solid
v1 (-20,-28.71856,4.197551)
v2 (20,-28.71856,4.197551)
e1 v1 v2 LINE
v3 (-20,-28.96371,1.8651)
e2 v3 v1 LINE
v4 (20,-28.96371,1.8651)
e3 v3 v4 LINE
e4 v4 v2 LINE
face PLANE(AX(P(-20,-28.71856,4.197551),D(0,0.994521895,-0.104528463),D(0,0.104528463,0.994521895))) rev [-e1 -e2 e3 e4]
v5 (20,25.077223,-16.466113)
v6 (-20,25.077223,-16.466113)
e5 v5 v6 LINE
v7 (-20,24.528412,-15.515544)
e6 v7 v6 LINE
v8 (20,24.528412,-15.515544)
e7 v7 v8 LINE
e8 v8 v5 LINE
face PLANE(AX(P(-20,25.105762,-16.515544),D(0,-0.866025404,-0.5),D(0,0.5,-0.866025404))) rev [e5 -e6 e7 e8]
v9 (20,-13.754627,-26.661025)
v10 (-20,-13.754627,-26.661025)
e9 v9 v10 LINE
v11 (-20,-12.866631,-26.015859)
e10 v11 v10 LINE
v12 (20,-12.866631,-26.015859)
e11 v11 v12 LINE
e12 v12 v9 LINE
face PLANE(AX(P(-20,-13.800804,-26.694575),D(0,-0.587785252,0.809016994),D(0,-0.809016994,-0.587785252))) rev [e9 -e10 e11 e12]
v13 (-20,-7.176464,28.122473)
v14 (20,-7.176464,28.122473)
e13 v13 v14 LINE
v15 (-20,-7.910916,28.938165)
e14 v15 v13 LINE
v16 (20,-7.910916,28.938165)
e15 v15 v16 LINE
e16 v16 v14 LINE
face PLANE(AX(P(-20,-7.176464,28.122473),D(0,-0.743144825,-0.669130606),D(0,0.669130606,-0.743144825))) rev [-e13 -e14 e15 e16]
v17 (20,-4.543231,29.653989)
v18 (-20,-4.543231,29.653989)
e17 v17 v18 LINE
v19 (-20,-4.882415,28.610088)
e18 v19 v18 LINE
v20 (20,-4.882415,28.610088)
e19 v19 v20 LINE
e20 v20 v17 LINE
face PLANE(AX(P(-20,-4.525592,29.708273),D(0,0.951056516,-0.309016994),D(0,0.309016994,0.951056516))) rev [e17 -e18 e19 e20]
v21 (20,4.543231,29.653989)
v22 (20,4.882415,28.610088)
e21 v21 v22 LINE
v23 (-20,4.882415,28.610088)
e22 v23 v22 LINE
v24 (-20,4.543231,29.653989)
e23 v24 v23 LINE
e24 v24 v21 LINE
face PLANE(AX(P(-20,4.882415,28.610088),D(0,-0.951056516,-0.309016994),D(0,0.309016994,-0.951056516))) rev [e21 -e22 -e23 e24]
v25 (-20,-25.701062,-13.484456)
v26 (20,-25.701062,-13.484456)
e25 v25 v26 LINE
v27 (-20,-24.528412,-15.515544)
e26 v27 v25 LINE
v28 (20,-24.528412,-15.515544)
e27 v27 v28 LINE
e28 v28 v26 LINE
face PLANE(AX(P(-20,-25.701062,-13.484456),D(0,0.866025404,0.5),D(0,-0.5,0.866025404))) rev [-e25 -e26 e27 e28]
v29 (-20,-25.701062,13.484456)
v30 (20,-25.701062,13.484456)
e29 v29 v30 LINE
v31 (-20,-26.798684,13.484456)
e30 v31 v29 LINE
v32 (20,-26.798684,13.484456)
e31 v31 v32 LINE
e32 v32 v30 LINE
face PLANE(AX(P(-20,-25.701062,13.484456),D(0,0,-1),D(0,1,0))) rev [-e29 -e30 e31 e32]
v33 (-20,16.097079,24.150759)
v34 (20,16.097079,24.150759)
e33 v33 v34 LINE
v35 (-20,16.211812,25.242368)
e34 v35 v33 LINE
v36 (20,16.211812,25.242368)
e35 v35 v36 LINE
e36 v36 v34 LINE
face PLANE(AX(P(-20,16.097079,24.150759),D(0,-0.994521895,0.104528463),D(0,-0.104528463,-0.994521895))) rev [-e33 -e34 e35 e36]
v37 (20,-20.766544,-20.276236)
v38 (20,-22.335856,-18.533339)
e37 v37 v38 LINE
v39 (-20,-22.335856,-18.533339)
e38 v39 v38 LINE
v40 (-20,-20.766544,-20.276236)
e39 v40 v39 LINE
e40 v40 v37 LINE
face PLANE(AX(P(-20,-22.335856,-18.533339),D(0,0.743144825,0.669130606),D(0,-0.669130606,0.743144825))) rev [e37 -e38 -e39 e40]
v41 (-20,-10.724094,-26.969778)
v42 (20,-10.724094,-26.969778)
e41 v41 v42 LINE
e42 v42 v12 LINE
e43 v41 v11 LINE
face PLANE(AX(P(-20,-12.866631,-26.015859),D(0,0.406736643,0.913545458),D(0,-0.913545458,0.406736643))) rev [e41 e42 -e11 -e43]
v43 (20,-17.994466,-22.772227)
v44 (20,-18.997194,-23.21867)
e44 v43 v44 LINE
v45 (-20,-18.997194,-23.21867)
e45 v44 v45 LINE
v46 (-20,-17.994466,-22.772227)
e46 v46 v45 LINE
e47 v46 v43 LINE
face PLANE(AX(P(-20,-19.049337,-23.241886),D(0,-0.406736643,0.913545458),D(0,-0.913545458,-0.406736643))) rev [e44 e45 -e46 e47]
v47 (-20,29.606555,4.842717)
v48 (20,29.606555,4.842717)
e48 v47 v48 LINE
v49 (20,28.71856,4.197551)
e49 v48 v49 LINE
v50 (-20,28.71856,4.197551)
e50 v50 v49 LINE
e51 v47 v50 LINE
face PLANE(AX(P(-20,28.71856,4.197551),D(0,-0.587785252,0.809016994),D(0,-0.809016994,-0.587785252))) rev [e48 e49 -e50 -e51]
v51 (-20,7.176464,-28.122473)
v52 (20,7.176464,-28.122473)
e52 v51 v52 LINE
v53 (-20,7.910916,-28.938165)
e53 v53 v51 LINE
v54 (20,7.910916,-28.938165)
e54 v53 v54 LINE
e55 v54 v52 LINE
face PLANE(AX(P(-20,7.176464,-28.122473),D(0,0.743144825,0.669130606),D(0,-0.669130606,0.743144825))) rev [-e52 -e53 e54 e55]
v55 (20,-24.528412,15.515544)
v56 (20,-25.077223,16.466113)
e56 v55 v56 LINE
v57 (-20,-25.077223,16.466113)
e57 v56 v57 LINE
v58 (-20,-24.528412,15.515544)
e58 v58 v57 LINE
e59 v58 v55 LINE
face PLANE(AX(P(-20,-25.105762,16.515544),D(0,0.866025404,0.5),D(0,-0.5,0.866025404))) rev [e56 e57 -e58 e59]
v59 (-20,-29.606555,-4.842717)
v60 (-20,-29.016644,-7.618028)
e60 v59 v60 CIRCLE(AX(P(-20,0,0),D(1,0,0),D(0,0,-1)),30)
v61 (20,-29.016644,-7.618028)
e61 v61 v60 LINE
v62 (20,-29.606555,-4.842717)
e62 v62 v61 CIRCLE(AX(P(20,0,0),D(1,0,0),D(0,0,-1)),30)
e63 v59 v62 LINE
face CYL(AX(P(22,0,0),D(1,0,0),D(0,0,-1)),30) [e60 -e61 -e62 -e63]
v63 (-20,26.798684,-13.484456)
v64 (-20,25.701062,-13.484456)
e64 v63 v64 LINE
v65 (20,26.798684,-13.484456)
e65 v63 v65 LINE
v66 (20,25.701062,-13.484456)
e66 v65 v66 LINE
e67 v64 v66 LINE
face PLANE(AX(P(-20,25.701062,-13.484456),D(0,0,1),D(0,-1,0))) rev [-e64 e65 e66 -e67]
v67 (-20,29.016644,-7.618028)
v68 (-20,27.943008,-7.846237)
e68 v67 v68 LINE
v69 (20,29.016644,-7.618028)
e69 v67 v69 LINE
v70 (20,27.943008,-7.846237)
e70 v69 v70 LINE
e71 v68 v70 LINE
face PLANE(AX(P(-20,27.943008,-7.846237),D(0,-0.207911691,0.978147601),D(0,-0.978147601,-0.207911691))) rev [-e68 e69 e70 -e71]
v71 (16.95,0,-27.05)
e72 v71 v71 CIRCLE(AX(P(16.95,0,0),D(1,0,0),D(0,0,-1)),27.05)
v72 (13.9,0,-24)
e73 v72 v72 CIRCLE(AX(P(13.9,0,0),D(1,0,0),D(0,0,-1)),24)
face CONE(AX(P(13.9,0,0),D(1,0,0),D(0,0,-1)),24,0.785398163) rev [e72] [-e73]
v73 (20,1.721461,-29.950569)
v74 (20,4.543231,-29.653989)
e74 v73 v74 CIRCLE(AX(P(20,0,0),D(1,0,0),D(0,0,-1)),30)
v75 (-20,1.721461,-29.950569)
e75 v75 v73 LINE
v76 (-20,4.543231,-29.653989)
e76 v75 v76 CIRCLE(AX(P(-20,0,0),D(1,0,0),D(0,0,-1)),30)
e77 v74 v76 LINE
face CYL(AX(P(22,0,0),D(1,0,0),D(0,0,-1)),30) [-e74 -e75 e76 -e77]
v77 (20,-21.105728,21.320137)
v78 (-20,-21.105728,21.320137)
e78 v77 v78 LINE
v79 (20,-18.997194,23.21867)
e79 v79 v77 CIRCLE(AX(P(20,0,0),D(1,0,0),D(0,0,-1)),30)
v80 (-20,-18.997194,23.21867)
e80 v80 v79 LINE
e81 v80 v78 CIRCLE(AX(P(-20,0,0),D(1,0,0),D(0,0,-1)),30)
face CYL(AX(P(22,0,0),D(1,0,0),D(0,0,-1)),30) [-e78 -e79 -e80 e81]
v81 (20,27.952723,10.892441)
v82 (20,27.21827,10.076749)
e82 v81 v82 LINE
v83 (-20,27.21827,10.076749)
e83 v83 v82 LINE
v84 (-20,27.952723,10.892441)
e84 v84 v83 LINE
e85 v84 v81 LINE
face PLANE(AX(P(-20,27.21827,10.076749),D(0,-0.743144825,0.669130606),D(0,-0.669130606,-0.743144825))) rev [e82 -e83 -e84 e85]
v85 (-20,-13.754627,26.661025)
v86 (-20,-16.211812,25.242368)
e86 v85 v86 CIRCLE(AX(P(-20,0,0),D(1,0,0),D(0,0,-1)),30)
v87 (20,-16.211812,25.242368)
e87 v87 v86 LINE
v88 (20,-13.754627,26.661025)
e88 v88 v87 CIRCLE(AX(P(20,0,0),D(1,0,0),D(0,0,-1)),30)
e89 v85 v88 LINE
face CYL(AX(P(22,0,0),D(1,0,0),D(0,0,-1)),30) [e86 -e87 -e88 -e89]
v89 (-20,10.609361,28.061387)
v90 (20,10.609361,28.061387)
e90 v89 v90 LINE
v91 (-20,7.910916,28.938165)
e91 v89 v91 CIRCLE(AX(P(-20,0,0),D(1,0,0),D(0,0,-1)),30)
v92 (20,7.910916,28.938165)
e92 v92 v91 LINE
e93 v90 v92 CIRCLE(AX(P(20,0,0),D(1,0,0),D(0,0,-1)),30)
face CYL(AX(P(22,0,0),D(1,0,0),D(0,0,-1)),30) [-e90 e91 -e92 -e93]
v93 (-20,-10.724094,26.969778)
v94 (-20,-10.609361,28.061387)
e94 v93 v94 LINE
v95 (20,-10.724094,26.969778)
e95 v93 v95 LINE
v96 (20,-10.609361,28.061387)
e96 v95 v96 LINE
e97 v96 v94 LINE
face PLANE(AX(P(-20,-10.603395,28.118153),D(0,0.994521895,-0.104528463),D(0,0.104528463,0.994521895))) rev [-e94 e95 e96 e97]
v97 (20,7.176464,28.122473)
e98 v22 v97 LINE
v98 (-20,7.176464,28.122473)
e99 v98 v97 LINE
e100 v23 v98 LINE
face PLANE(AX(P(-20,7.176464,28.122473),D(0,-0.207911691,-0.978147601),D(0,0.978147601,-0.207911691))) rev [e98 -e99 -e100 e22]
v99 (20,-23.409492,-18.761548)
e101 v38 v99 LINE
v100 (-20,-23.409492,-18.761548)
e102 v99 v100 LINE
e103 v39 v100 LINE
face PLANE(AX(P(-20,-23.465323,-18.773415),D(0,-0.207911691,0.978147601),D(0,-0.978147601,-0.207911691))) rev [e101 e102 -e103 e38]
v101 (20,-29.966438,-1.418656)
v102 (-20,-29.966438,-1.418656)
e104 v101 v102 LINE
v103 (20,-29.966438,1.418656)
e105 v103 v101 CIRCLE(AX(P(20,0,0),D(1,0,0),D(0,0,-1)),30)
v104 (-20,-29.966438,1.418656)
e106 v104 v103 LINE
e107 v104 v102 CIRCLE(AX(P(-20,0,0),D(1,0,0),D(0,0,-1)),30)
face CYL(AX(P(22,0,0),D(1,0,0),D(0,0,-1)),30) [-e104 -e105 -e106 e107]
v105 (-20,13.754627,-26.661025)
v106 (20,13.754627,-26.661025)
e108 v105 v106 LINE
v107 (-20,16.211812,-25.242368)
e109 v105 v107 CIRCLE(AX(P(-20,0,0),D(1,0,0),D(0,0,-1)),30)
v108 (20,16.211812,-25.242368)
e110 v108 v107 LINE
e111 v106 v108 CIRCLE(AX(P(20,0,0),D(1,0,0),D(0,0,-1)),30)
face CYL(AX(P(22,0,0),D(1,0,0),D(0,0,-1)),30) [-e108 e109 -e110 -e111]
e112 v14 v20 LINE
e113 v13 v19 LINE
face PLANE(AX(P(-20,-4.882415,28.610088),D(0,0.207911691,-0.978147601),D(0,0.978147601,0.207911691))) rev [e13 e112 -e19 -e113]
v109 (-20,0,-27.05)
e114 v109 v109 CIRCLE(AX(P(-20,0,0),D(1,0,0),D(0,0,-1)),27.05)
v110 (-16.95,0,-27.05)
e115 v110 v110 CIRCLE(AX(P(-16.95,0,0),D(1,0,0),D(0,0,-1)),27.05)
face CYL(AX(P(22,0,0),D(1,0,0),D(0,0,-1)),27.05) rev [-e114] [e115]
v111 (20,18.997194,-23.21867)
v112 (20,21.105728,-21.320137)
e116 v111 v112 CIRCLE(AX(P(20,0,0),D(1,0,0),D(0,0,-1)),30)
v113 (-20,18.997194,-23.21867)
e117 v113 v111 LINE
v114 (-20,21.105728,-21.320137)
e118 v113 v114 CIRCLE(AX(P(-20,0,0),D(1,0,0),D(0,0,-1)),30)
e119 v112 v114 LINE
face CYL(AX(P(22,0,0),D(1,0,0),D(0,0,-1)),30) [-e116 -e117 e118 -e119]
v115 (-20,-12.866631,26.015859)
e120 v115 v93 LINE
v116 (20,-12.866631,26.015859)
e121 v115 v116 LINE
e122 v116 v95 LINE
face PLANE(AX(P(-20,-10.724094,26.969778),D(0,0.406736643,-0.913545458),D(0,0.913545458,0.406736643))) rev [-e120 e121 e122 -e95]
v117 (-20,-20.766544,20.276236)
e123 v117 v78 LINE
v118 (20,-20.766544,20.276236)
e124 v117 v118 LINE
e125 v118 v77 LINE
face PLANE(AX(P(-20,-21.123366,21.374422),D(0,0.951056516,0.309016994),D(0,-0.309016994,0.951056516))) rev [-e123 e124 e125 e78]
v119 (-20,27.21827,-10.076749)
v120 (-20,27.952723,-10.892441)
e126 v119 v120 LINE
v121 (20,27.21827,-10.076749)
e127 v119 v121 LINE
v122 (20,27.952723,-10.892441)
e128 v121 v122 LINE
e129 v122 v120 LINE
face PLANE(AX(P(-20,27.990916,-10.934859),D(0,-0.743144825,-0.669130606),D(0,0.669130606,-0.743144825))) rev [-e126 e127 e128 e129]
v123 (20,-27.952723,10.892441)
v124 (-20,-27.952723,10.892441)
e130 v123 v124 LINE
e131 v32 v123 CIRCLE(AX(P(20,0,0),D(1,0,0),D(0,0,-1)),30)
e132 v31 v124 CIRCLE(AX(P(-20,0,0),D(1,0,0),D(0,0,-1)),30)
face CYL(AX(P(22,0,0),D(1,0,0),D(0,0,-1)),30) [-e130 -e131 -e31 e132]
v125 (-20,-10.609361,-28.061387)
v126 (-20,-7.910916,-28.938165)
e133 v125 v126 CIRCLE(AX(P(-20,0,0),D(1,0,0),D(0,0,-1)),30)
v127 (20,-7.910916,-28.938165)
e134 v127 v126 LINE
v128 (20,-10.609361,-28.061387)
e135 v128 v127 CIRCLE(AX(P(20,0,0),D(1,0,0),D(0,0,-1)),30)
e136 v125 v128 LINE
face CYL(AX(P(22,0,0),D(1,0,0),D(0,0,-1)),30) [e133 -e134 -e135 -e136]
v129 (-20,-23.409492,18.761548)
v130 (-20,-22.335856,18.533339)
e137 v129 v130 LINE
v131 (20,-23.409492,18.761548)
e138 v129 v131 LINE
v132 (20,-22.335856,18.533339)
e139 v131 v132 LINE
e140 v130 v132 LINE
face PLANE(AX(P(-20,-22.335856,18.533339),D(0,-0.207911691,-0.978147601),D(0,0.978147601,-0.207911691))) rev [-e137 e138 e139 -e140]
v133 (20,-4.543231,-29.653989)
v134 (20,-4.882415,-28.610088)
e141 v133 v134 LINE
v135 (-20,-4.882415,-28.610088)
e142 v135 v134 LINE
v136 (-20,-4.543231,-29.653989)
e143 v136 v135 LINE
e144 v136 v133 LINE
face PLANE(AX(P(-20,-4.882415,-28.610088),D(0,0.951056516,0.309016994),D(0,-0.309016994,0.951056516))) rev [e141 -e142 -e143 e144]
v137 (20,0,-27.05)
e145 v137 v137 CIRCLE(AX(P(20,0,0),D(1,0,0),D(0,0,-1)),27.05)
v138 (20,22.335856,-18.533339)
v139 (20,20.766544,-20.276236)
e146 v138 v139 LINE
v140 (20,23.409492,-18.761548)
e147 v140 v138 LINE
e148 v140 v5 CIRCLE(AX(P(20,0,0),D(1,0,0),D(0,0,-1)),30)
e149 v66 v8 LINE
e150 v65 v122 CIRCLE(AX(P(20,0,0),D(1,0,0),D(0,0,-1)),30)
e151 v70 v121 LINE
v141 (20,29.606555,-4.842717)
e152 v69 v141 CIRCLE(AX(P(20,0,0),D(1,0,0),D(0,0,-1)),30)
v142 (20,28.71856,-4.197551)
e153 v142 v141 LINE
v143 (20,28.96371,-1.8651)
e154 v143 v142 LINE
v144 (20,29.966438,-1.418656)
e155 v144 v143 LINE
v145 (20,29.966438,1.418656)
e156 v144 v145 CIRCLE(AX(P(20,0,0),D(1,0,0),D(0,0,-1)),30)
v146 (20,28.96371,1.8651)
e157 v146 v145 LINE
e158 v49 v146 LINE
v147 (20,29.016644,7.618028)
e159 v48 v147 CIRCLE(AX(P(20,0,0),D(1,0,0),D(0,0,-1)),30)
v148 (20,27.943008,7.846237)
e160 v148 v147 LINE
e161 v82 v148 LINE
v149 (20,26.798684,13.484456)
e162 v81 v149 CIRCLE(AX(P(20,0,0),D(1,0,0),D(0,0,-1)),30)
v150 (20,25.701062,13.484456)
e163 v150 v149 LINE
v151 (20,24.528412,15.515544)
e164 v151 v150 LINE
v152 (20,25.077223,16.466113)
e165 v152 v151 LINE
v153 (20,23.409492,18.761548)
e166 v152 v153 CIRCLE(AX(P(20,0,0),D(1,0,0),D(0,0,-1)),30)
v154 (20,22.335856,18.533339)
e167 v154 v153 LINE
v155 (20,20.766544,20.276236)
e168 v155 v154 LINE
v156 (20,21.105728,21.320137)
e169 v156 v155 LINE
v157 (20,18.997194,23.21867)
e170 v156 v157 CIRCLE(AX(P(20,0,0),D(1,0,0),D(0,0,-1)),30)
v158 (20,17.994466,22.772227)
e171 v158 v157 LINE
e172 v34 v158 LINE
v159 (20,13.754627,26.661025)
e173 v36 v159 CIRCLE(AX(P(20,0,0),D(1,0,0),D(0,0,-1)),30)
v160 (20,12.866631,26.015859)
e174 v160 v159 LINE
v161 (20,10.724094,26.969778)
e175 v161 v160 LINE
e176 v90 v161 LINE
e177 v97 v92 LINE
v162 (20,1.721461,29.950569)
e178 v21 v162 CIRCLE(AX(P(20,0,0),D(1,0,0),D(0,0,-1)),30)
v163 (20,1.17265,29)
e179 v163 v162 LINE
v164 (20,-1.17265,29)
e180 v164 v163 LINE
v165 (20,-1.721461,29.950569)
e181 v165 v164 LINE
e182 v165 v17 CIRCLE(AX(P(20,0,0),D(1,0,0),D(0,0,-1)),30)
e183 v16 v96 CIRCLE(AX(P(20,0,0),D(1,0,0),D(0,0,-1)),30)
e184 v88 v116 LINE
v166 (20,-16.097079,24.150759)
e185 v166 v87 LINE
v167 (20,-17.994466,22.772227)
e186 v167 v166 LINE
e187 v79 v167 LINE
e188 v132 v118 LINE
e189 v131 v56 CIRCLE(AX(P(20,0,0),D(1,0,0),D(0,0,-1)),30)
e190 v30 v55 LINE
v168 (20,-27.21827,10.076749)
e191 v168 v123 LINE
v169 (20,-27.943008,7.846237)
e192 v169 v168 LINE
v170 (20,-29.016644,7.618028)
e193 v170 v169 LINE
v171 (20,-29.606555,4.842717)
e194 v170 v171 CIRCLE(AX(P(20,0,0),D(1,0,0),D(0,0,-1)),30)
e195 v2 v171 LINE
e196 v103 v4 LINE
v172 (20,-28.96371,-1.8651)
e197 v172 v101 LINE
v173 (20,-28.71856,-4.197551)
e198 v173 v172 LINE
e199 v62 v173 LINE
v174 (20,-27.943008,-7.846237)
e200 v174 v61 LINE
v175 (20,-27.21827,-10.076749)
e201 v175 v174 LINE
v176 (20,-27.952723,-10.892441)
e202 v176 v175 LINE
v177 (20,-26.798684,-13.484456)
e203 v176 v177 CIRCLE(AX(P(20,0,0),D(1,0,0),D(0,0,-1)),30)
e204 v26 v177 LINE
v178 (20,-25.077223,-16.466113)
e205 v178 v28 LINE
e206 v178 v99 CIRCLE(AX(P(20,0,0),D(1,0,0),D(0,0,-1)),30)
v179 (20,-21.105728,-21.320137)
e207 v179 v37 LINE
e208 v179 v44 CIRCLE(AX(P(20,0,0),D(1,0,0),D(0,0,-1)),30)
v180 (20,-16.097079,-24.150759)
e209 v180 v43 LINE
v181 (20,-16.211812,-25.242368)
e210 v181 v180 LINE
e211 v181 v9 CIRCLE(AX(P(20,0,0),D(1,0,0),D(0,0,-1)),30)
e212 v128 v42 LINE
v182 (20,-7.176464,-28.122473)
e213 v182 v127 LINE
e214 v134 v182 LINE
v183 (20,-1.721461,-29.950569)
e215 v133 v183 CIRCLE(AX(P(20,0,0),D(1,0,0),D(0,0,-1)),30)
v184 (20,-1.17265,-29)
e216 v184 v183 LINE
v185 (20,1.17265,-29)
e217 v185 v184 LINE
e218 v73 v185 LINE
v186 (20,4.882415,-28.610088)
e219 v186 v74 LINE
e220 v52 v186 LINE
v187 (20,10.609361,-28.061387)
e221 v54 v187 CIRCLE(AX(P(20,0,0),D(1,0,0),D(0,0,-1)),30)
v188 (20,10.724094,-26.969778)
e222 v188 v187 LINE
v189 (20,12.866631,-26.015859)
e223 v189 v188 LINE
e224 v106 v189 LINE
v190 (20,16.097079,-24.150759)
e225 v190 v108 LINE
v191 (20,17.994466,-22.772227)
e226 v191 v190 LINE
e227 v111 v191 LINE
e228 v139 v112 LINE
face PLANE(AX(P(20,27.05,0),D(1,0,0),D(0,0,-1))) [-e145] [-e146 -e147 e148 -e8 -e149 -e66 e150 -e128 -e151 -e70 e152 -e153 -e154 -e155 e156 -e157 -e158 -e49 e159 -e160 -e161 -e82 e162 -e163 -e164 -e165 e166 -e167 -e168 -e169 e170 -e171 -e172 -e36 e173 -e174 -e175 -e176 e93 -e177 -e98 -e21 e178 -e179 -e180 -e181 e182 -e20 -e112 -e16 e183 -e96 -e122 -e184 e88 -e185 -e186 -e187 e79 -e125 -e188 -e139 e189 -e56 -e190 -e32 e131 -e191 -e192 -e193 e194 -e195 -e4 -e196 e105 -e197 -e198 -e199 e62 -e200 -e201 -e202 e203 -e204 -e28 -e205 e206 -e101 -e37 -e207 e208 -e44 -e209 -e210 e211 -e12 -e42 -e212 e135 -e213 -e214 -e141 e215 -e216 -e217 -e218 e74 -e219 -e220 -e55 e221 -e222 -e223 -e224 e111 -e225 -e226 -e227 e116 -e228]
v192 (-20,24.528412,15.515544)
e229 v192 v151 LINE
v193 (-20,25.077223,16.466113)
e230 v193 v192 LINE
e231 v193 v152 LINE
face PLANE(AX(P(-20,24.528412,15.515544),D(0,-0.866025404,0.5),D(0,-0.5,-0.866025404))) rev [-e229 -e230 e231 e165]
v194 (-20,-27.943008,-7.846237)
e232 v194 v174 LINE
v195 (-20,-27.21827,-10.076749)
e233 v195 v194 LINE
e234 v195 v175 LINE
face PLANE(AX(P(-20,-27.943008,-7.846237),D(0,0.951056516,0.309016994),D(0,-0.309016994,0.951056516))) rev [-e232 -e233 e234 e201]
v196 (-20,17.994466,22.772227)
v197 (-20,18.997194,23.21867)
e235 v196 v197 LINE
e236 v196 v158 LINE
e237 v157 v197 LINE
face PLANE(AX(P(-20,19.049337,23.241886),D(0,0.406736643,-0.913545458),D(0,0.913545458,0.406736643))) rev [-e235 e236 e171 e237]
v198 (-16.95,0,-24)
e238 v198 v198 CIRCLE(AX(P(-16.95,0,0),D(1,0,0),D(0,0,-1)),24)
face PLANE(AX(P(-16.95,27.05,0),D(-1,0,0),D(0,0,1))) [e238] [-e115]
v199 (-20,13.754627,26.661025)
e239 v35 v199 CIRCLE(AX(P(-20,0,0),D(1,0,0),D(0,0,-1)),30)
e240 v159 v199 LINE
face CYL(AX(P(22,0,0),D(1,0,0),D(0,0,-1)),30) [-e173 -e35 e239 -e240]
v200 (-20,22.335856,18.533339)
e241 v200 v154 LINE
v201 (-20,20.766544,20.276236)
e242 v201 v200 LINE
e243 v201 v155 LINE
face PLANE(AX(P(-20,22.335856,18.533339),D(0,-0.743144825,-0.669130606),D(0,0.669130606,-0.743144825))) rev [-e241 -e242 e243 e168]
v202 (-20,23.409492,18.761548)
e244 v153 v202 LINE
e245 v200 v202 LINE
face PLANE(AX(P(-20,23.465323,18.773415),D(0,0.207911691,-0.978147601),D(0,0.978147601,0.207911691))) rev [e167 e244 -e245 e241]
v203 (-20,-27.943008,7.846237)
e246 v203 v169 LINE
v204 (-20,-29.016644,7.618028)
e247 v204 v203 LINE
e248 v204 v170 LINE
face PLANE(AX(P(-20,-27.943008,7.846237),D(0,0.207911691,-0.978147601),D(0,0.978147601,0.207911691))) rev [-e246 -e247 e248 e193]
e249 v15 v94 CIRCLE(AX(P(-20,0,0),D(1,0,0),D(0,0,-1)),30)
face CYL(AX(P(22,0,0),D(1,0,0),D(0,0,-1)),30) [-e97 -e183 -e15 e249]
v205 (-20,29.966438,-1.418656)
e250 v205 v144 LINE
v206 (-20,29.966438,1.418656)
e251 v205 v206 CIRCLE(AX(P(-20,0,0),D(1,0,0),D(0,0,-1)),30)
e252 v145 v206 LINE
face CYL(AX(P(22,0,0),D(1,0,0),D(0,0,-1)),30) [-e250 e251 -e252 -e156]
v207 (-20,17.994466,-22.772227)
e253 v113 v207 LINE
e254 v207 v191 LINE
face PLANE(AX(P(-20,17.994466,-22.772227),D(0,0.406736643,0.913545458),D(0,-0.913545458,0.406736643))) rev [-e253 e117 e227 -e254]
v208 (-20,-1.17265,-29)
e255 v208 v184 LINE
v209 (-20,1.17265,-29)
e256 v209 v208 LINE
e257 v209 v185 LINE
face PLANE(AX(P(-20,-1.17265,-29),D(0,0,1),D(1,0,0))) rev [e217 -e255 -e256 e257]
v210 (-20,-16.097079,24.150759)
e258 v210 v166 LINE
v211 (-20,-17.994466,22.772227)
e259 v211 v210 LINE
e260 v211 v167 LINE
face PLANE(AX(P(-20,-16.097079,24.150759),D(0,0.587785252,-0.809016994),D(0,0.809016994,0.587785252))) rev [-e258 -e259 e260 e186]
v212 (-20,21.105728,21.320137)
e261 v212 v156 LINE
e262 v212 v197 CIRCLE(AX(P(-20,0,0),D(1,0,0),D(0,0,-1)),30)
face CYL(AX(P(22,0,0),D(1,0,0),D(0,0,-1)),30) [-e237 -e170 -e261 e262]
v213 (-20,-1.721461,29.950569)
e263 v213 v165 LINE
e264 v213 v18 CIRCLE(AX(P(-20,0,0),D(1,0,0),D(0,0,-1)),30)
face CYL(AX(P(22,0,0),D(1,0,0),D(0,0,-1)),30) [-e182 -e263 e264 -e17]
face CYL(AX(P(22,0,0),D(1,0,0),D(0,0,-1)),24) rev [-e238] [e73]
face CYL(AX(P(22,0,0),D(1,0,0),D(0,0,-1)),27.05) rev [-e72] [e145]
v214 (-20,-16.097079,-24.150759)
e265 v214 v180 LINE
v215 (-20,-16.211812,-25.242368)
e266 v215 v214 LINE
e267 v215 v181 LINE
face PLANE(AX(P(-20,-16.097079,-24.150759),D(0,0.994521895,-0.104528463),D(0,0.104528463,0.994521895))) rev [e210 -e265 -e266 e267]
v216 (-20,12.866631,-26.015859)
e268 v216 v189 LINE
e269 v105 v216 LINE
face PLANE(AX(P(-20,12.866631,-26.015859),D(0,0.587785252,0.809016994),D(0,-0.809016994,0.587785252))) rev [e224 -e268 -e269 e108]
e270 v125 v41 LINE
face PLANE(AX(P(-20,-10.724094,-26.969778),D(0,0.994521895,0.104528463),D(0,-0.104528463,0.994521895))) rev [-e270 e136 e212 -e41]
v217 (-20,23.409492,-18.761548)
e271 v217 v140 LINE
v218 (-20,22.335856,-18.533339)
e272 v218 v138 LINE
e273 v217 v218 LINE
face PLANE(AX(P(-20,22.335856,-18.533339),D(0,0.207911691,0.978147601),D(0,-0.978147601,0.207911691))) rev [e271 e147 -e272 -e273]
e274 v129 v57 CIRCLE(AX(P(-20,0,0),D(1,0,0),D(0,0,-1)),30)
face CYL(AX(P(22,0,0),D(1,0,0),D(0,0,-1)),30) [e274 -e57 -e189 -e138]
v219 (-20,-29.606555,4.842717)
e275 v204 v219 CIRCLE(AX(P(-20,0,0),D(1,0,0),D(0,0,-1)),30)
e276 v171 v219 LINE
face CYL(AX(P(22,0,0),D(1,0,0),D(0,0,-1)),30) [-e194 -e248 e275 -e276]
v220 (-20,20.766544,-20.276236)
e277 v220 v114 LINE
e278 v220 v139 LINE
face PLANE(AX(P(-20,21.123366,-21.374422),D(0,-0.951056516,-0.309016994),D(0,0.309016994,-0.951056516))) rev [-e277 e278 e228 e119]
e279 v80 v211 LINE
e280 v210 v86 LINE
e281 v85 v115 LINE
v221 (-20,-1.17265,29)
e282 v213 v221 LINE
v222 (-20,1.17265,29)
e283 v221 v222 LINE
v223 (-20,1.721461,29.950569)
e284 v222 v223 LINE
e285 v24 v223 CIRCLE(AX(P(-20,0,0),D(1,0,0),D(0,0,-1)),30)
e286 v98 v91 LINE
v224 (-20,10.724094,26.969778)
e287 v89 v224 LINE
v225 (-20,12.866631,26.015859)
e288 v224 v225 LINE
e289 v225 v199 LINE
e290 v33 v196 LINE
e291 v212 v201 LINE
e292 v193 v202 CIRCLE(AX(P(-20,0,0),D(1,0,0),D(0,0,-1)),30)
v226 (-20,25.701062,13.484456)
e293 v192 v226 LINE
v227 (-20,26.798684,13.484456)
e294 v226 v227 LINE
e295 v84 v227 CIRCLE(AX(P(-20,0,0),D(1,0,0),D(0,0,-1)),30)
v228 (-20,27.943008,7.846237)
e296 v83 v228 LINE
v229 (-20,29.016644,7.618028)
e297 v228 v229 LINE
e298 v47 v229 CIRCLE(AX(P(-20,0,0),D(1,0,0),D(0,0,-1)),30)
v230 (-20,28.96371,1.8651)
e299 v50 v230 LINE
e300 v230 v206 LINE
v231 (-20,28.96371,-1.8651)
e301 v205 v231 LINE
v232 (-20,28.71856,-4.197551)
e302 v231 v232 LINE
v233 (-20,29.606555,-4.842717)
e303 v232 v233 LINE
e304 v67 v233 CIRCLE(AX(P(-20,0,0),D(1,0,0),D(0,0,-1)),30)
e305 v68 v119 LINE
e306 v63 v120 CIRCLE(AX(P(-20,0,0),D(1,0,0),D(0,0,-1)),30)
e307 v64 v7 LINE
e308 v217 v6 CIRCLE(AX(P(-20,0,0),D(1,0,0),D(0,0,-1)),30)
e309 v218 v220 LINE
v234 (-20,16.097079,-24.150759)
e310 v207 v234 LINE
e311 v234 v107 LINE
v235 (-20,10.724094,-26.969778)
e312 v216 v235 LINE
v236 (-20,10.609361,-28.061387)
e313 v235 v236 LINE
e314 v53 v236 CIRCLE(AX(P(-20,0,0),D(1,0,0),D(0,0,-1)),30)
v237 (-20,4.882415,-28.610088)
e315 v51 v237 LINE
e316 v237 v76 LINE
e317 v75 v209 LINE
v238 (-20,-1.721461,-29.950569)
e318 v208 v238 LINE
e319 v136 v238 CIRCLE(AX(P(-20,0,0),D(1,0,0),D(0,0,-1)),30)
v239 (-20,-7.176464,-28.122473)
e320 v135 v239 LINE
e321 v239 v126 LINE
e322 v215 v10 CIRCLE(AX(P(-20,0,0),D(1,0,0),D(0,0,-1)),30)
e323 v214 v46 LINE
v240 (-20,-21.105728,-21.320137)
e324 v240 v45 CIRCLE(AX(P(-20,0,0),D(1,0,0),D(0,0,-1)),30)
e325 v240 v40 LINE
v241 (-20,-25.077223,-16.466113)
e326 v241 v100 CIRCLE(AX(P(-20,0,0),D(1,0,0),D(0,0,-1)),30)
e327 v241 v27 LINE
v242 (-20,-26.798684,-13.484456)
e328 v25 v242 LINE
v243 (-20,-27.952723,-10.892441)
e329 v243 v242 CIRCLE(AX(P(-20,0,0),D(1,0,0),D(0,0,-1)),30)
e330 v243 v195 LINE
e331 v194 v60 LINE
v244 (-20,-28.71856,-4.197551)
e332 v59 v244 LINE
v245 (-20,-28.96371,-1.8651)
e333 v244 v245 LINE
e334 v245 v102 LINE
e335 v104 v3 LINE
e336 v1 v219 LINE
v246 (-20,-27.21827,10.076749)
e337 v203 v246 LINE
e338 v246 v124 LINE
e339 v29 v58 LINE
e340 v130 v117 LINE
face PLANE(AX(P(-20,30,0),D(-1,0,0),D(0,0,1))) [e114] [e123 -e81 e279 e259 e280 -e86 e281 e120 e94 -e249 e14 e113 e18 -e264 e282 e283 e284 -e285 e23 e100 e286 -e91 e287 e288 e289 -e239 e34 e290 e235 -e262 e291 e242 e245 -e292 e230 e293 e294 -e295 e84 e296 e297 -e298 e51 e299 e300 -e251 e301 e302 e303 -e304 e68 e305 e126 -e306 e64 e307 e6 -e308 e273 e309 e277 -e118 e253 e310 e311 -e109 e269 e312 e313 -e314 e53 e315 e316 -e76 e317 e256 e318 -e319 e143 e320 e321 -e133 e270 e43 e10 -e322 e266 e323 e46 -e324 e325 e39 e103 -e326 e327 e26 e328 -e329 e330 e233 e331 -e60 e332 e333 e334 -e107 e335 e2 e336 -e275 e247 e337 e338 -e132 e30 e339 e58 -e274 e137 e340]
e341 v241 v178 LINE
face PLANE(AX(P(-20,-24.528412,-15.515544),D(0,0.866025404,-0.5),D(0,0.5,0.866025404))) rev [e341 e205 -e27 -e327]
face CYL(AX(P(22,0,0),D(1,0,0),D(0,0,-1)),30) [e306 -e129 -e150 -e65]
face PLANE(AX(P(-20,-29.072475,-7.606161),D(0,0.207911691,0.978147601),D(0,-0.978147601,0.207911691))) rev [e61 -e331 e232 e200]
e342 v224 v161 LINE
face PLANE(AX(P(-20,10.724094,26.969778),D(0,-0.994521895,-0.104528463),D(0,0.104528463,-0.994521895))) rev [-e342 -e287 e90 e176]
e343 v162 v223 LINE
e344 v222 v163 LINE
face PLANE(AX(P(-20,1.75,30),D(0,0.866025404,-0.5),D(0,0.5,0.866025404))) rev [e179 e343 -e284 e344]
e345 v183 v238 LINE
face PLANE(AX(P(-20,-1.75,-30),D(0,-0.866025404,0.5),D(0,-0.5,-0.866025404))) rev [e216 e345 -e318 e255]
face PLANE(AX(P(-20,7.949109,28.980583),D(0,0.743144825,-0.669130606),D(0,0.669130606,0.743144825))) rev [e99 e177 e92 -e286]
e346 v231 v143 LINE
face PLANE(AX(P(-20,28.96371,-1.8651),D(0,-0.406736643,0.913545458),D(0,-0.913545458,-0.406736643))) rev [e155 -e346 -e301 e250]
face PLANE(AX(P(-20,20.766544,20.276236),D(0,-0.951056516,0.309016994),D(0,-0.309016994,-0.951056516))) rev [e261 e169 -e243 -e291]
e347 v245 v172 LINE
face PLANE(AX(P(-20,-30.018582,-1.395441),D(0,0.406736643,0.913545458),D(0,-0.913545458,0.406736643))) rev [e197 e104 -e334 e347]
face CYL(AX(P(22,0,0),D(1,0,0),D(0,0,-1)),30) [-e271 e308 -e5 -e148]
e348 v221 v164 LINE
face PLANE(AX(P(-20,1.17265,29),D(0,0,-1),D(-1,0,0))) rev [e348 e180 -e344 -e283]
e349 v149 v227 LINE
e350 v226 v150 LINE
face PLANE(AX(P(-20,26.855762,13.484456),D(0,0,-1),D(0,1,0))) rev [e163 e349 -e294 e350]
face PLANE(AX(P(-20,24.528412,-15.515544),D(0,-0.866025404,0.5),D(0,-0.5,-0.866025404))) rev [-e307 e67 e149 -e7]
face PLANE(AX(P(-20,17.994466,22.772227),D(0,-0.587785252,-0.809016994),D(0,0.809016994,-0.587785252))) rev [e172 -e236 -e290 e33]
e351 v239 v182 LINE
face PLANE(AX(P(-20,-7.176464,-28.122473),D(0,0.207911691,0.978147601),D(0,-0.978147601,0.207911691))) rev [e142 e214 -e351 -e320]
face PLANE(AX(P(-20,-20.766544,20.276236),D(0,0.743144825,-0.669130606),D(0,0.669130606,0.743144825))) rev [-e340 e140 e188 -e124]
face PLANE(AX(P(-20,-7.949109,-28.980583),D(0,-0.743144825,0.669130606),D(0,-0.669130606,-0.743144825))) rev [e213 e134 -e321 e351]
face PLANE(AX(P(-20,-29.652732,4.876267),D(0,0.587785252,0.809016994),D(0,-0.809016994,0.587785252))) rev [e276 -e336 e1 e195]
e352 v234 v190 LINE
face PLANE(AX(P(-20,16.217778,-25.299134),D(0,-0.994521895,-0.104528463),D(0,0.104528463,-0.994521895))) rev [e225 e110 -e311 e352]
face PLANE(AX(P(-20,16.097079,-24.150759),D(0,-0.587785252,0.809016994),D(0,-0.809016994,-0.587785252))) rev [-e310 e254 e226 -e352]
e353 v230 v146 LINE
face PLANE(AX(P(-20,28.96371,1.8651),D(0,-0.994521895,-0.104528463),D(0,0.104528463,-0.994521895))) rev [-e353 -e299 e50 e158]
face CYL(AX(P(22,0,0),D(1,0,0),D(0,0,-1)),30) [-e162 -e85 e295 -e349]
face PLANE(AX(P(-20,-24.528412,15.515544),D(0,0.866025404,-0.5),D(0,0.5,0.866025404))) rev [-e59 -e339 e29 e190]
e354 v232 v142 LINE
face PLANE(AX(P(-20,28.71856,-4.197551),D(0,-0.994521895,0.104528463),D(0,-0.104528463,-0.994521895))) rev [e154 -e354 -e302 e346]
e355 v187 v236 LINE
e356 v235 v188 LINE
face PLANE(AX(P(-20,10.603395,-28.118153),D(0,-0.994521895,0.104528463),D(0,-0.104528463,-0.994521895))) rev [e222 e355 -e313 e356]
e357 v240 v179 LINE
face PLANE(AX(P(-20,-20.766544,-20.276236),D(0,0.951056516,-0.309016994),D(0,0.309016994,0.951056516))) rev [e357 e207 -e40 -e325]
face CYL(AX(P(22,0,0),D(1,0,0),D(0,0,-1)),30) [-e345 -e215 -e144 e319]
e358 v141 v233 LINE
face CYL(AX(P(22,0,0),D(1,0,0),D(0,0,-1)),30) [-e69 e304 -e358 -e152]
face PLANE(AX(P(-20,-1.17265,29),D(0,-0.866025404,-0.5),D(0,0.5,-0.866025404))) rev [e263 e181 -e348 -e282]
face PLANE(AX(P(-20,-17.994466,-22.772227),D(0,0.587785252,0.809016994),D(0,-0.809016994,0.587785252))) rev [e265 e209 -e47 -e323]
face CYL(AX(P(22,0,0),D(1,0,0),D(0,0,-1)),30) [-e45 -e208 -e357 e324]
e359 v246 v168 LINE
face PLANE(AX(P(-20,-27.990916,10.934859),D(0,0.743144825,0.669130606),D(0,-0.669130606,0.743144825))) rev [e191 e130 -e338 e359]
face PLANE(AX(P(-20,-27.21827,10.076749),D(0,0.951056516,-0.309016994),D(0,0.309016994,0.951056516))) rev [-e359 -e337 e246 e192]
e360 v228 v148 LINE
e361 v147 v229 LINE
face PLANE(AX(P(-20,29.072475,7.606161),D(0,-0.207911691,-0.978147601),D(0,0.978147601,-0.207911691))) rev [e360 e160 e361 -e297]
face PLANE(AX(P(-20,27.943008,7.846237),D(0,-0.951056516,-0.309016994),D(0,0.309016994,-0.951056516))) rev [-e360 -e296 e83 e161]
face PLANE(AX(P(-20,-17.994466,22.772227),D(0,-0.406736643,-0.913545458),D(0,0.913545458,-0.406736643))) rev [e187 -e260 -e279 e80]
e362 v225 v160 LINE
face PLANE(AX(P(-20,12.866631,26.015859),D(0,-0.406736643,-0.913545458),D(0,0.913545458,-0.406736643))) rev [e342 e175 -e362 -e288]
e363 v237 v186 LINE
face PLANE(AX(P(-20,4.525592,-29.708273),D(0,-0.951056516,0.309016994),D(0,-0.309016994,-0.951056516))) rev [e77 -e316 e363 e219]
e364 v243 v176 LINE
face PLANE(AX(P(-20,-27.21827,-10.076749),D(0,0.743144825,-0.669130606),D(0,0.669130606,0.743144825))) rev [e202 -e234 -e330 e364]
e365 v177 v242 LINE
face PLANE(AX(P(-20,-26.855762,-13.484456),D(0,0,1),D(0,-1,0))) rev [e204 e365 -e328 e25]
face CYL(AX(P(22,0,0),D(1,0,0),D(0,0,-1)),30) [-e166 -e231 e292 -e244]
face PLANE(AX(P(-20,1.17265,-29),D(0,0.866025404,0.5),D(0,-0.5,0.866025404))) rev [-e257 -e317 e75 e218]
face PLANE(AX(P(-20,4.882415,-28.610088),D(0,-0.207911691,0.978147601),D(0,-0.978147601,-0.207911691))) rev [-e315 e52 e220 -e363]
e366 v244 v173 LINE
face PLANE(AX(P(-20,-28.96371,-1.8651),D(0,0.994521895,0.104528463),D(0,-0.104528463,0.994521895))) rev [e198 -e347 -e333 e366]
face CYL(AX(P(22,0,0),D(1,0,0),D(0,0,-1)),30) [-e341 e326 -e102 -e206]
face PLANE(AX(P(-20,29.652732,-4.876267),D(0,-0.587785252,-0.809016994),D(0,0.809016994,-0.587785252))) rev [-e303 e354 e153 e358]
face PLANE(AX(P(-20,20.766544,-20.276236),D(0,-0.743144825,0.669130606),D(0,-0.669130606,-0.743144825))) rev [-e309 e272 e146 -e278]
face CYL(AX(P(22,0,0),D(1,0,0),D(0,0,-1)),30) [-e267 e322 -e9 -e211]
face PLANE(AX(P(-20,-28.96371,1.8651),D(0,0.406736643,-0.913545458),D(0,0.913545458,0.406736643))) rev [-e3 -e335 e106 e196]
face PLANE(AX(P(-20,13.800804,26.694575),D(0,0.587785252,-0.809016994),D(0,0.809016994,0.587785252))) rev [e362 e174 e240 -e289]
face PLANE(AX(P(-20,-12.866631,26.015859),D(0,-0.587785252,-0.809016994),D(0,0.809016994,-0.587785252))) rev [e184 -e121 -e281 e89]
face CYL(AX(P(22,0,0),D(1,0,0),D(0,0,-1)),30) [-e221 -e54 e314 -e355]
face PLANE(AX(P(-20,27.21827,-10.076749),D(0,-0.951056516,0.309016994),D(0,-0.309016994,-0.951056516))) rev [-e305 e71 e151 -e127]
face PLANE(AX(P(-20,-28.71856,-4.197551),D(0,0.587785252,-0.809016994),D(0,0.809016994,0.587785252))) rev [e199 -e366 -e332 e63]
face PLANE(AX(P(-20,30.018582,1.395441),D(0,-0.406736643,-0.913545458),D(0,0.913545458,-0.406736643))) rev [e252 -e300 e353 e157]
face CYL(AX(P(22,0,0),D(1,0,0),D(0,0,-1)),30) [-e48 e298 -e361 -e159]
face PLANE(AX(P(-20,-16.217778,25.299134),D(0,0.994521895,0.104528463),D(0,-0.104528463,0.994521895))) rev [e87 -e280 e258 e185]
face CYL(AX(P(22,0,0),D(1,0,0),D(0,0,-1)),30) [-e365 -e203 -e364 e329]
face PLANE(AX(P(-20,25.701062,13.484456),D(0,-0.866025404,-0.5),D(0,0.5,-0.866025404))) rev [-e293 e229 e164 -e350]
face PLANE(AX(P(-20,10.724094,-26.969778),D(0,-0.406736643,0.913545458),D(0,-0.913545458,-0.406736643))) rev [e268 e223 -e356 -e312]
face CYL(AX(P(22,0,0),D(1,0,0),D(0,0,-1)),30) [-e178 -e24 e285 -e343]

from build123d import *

# Parameters (mm, degrees)
CUT_EXTRUDE2_DEPTH = 47.904157598
CIRPATTERN4_COUNT  = 30


with BuildPart() as part:
    # Sketch1 → Revolve1 (revolve)
    with BuildSketch(Plane.XY, mode=Mode.PRIVATE) as revolve1_sk:
        Polygon((-20, 30), (20, 30), (20, 27.05), (16.95, 27.05), (13.9, 24), (-16.95, 24), (-16.95, 27.05), (-20, 27.05), align=None)
    revolve(revolve1_sk.sketch.rotate(Axis((22, 0, 0), (-1, 0, 0)), 90), axis=Axis((22, 0, 0), (-1, 0, 0)))

    # Sketch6 → Cut-Extrude2 (cut, symmetric)
    with BuildSketch(Plane(origin=(0, 0, 0), x_dir=(0, 0, -1), z_dir=(1, 0, 0))):
        Polygon((-30, 1.75), (-29, 1.172649731), (-29, -1.172649731), (-30, -1.75), align=None)
    cut_extrude2 = extrude(amount=CUT_EXTRUDE2_DEPTH, both=True, mode=Mode.SUBTRACT)

    # CirPattern4: Cut-Extrude2 ×30 about axis
    cirpattern4_axis = Axis((0, 0, 0), (1, 0, 0))
    for i in range(1, CIRPATTERN4_COUNT):
        add(cut_extrude2.rotate(cirpattern4_axis, i * 360 / CIRPATTERN4_COUNT), mode=Mode.SUBTRACT)


solid = part.part
